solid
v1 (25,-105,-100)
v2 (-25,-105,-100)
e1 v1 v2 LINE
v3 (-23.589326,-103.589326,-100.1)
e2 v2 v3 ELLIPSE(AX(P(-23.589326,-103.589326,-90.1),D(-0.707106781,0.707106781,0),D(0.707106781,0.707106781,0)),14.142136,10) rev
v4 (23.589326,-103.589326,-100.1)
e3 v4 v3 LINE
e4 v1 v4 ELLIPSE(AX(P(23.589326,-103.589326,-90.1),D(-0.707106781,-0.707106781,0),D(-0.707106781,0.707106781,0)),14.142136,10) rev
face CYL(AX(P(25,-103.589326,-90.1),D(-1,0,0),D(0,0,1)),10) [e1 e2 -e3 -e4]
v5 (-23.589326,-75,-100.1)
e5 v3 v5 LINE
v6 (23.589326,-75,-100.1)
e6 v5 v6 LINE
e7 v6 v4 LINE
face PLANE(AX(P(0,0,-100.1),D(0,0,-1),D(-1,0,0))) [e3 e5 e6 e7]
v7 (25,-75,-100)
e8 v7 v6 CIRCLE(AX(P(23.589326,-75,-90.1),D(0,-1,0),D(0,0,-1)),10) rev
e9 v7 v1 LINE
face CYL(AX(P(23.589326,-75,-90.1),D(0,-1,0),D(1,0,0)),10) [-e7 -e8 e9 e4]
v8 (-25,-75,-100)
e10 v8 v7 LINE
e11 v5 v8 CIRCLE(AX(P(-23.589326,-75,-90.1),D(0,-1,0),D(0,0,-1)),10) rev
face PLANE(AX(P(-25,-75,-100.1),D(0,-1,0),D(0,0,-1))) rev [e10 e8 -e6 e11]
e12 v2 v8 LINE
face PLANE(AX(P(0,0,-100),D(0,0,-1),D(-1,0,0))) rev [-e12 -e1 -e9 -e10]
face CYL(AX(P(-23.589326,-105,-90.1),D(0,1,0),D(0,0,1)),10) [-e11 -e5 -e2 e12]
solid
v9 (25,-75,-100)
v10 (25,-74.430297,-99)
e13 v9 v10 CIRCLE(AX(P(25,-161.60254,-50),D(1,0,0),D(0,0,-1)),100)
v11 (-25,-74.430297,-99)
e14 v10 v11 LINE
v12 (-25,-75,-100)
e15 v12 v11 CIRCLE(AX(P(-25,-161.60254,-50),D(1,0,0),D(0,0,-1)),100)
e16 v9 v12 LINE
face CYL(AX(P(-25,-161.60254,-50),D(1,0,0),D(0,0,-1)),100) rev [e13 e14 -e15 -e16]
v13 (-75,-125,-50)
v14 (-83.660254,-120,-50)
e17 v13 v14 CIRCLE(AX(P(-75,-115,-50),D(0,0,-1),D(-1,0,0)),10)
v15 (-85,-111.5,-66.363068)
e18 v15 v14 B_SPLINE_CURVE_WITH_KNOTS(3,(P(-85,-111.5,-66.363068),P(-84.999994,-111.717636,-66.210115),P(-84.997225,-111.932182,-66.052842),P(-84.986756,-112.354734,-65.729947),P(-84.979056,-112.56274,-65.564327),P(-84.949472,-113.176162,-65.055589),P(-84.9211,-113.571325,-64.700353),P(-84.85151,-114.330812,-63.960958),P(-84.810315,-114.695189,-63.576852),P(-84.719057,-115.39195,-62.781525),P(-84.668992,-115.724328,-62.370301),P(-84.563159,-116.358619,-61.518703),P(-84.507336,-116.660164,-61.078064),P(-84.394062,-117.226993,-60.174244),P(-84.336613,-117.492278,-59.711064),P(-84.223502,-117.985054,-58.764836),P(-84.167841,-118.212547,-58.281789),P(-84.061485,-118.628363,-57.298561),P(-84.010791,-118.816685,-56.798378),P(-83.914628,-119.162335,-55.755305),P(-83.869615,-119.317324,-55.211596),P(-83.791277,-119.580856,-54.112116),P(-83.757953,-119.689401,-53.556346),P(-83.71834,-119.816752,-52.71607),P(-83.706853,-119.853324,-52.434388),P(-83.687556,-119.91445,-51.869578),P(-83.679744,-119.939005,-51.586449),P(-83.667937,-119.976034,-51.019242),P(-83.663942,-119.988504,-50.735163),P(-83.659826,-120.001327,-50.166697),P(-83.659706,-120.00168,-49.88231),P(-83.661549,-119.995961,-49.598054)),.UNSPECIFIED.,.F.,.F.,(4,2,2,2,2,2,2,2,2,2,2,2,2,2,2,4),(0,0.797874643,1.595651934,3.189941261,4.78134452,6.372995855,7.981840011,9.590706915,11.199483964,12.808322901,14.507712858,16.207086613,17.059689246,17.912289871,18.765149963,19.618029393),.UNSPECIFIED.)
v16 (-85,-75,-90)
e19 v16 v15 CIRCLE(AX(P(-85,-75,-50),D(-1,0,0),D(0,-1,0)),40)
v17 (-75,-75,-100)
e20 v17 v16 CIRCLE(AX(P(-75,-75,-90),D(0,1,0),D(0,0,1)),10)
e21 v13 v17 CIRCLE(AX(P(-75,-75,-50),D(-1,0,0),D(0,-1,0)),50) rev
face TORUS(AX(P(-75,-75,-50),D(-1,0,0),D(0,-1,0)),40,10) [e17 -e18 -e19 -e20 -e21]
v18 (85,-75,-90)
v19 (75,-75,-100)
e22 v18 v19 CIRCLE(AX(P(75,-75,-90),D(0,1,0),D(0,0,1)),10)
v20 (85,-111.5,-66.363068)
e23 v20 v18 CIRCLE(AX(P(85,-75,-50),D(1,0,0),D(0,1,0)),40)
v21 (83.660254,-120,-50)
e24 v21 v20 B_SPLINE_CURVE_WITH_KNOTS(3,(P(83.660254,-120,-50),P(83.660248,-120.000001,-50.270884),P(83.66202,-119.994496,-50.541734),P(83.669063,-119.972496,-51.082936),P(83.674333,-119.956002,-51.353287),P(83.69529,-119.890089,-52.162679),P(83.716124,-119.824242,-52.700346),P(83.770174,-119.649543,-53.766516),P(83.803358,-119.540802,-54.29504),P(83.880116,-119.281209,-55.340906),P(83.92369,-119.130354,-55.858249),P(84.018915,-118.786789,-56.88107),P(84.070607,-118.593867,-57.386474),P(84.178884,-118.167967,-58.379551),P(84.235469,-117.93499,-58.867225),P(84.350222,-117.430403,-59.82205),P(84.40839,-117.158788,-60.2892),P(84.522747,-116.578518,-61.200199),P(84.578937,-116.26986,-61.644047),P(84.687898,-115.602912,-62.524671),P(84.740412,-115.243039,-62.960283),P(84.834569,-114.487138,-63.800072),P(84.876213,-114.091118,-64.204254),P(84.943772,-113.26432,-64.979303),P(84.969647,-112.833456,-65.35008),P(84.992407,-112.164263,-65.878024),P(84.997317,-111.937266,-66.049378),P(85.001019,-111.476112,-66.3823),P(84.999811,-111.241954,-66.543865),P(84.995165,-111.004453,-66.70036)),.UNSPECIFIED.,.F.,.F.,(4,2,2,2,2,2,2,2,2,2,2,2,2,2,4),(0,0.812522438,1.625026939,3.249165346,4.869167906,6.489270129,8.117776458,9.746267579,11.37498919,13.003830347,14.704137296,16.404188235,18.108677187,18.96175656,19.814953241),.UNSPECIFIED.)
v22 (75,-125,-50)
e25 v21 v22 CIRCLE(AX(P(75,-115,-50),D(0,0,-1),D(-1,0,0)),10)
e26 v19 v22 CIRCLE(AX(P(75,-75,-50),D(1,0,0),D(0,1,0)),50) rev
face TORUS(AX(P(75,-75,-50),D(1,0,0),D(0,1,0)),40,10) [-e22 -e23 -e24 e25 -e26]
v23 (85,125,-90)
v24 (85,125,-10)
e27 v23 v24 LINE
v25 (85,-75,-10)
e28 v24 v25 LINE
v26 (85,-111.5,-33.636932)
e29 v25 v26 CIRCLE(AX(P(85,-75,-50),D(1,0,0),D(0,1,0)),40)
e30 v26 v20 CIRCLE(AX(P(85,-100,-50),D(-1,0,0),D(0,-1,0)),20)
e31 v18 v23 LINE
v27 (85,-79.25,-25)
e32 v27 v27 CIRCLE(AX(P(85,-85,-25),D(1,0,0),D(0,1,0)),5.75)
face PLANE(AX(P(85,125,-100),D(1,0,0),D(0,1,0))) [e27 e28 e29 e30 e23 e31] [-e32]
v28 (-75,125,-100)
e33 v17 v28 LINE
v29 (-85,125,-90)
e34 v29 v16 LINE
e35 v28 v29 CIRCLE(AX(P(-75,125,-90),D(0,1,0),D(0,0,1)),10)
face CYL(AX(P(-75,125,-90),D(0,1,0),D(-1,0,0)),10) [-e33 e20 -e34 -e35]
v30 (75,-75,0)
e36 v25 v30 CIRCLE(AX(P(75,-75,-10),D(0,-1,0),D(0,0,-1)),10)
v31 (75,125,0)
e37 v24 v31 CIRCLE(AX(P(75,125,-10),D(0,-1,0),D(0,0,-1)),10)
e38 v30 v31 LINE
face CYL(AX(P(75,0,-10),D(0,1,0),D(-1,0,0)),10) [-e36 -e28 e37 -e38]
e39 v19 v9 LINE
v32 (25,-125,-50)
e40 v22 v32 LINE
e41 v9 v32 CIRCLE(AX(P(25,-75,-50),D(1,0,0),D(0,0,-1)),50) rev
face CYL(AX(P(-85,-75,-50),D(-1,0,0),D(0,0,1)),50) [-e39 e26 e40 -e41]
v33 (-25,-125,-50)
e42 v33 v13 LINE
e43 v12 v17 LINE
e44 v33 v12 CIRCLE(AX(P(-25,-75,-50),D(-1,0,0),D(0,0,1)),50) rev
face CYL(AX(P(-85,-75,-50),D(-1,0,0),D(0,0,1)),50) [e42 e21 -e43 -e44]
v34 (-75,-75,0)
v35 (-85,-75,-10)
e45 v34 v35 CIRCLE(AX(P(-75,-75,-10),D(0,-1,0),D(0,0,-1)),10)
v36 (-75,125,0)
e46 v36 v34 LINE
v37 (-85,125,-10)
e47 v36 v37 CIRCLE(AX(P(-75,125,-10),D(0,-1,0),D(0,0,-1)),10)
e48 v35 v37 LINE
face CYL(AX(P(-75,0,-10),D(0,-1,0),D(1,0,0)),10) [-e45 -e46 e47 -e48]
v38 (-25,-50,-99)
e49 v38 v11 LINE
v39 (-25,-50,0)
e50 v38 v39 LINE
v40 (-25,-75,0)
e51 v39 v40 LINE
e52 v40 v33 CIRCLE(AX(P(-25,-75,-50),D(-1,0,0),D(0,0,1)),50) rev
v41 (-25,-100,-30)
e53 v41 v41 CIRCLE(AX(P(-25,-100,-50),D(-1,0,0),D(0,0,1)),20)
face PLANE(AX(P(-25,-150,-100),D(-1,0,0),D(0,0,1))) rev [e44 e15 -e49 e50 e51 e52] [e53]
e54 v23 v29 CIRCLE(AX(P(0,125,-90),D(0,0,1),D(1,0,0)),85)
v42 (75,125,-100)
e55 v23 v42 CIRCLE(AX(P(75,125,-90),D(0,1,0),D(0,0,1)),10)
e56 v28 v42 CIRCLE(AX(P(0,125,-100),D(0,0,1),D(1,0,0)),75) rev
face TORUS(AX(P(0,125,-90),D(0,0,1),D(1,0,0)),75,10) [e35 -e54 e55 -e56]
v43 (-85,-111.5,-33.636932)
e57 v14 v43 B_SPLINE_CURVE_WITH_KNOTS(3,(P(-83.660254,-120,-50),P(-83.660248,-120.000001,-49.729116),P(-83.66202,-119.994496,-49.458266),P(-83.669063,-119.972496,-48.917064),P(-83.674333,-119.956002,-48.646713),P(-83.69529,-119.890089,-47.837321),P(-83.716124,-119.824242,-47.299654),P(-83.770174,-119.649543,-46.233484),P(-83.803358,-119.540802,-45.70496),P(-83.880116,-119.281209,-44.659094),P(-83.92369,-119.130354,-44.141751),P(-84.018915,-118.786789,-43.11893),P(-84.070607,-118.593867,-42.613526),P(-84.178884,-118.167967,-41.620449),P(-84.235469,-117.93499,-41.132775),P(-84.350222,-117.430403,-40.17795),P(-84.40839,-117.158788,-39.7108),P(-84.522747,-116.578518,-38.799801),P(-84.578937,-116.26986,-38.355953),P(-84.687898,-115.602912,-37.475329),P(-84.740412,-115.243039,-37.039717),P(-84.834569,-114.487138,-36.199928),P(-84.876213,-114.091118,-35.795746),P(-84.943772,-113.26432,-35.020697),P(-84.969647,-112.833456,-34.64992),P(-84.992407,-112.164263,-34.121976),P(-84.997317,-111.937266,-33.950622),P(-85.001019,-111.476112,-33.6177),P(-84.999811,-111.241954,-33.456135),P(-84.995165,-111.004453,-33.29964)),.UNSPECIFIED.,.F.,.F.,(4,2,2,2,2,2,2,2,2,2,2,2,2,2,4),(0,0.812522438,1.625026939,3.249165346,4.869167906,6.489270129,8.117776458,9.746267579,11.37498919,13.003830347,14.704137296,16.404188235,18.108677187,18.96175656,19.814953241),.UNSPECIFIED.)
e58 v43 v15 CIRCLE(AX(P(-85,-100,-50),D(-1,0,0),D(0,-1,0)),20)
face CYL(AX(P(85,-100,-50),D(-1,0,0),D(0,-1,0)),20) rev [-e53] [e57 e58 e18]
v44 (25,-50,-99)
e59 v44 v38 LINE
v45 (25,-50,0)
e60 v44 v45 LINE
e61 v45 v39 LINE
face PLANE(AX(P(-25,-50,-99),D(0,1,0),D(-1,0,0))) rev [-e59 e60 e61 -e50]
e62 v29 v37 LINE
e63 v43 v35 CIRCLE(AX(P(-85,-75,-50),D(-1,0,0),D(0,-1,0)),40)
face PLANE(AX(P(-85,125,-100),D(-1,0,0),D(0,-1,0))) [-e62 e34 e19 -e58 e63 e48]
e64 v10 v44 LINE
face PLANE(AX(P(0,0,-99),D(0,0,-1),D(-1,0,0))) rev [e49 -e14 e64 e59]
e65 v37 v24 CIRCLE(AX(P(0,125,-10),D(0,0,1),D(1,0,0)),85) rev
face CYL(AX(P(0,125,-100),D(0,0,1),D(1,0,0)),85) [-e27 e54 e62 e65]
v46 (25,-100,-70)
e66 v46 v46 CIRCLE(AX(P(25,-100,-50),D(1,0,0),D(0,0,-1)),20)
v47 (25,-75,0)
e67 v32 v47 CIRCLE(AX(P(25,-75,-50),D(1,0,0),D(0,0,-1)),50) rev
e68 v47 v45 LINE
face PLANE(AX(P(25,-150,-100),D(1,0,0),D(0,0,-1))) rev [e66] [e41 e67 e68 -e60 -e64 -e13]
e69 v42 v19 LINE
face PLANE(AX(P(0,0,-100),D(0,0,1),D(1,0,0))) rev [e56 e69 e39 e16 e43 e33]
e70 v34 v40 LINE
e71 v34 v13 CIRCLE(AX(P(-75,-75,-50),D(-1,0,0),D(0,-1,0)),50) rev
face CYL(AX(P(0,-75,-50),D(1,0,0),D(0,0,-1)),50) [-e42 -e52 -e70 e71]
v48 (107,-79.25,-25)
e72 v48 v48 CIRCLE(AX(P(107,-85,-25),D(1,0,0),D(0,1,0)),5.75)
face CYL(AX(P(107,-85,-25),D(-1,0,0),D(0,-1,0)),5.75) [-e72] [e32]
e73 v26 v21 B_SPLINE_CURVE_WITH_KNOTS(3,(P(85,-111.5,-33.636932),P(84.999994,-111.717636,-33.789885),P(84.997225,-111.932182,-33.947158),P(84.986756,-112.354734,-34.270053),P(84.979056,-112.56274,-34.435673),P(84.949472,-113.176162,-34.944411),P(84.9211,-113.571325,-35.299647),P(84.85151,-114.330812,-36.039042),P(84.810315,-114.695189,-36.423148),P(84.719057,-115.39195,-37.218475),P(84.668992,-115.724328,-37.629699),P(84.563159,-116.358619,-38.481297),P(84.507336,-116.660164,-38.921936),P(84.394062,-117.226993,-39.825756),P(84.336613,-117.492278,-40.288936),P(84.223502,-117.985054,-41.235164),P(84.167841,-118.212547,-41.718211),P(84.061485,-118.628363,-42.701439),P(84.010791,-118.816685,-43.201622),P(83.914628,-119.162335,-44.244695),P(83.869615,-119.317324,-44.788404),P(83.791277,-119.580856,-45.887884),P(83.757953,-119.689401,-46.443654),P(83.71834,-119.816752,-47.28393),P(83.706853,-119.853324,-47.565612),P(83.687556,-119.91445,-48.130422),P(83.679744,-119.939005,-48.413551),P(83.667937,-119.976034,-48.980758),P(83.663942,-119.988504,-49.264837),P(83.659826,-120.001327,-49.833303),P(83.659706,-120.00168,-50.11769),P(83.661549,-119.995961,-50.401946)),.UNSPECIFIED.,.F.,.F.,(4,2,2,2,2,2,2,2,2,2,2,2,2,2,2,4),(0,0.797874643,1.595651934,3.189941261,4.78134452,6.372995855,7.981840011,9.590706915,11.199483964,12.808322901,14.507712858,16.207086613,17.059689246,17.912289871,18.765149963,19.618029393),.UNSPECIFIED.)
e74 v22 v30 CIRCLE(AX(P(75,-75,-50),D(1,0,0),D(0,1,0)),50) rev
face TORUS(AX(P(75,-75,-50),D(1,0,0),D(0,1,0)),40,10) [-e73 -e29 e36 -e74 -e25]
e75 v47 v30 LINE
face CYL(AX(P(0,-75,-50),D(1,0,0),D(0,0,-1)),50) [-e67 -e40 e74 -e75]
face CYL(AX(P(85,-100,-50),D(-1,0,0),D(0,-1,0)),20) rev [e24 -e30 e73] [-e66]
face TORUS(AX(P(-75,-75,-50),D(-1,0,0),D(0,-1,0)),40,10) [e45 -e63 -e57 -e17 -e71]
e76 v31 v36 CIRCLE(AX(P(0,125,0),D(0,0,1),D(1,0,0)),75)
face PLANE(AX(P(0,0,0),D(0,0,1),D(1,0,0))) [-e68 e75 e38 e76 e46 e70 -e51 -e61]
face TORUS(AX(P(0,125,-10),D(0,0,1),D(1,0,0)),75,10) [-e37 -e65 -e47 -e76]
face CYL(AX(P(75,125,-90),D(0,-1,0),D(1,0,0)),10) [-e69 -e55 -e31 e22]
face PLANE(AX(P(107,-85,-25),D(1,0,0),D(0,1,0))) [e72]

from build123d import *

# Parameters (mm, degrees)
BOSS_EXTRUDE1_DEPTH    = 100
SKETCH2_W              = 50
SKETCH2_H              = 50
CUT_EXTRUDE1_DEPTH     = 182.245689604
CUT_EXTRUDE2_DEPTH     = 25
SKETCH7_R              = 20
CUT_EXTRUDE3_DEPTH     = 234.505888577
FILLET2_R              = 50
CUT_EXTRUDE6_START     = -125
CUT_EXTRUDE6_OUTLINE_W = 50
CUT_EXTRUDE6_OUTLINE_H = 6.698729811
CUT_EXTRUDE6_DEPTH     = 50
CUT_EXTRUDE7_DEPTH     = 25
BOSS_EXTRUDE2_DEPTH    = 100
FILLET4_R              = 10
SKETCH11_W             = 50
SKETCH11_H             = 25
CUT_EXTRUDE11_DEPTH    = 99
SKETCH16_W             = 50
SKETCH16_H             = 30
BOSS_EXTRUDE3_DEPTH    = 0.1
FILLET5_R              = 10
SKETCH17_R             = 5.75
BOSS_EXTRUDE4_DEPTH    = 22


with BuildPart() as part:
    # Sketch1 → Boss-Extrude1 (new body)
    with BuildSketch(Plane.XY):
        Polygon((-85, 125), (10.2, 125), (59.8, 125), (85, 125), (85, -125), (-85, -125), align=None)
    extrude(amount=-BOSS_EXTRUDE1_DEPTH)

    # Sketch2 → Cut-Extrude1 (cut, through all)
    with BuildSketch(Plane.XY):
        with Locations((0, -125)):
            Rectangle(SKETCH2_W, SKETCH2_H)
    extrude(amount=-CUT_EXTRUDE1_DEPTH, mode=Mode.SUBTRACT)

    # Sketch6 → Cut-Extrude2 (cut, symmetric)
    with BuildSketch(Plane(origin=(0, 0, 0), x_dir=(0, 0, -1), z_dir=(1, 0, 0))):
        with BuildLine():
            Line((100, -100), (0, -100))
            ThreePointArc((0, -100), (50, -50), (100, -100))
        make_face()
    extrude(amount=CUT_EXTRUDE2_DEPTH, both=True, mode=Mode.SUBTRACT)

    # Sketch7 → Cut-Extrude3 (cut, through all)
    with BuildSketch(Plane.ZY.offset(85)):
        with Locations(Location((-50, -100, 0), (0, 0, 270))):
            Circle(SKETCH7_R)
    extrude(amount=-CUT_EXTRUDE3_DEPTH, mode=Mode.SUBTRACT)

    # Fillet2
    fillet2_edges = [part.edges().sort_by_distance(p)[0] for p in [
        (-55, -125, -100),
        (-55, -125, 0),
    ]]
    fillet(fillet2_edges, radius=FILLET2_R - 0.0001)  # a hair under: the kernel refuses the full size

    # Cut-Extrude6: read off the stored shape, not the designer's step
    # Cut-Extrude6 outline → Cut-Extrude6 (cut)
    with BuildSketch(Plane(origin=(0, 0, 0), x_dir=(1, 0, 0), z_dir=(0, 1, 0)).offset(CUT_EXTRUDE6_START)):
        with Locations((0, 96.650635095)):
            Rectangle(CUT_EXTRUDE6_OUTLINE_W, CUT_EXTRUDE6_OUTLINE_H)
        with Locations((0, 3.349364906)):
            Rectangle(CUT_EXTRUDE6_OUTLINE_W, CUT_EXTRUDE6_OUTLINE_H)
    extrude(amount=CUT_EXTRUDE6_DEPTH, mode=Mode.SUBTRACT)

    # Sketch10 → Cut-Extrude7 (cut, symmetric)
    with BuildSketch(Plane(origin=(0, 0, 0), x_dir=(0, 0, -1), z_dir=(1, 0, 0))):
        with BuildLine():
            Line((0, -75), (100, -75))
            ThreePointArc((100, -75), (50, -61.602540378), (0, -75))
        make_face()
    extrude(amount=CUT_EXTRUDE7_DEPTH, both=True, mode=Mode.SUBTRACT)

    # Sketch15 → Boss-Extrude2 (add)
    with BuildSketch(Plane.XY):
        with BuildLine():
            Line((-85, 125), (85, 125))
            ThreePointArc((85, 125), (0, 210), (-85, 125))
        make_face()
    extrude(amount=-BOSS_EXTRUDE2_DEPTH)

    # Fillet4
    # the kernel refuses this fillet: 10 mm, written as the material it takes off along each edge
    with BuildSketch(Plane(origin=(0, 125, -100), x_dir=(1, 0, 0), z_dir=(0, -1, 0))) as fillet4_piece_1:
        with BuildLine():
            CenterArc((85 - FILLET4_R, FILLET4_R), FILLET4_R, 270, 90)
            Line((85, FILLET4_R), (85, 0))
            Line((85, 0), (85 - FILLET4_R, 0))
        make_face()
    revolve(axis=Axis((0, 125, -100), (0, 0, 1)), revolution_arc=180, mode=Mode.SUBTRACT)
    with BuildSketch(Plane(origin=(0, 125, 0), x_dir=(1, 0, 0), z_dir=(0, -1, 0))) as fillet4_piece_2:
        with BuildLine():
            CenterArc((85 - FILLET4_R, -FILLET4_R), FILLET4_R, 0, 90)
            Line((85, -FILLET4_R), (85, 0))
            Line((85, 0), (85 - FILLET4_R, 0))
        make_face()
    revolve(axis=Axis((0, 125, 0), (0, 0, 1)), revolution_arc=180, mode=Mode.SUBTRACT)
    with BuildSketch(Plane(origin=(-85, -75.0001, -100), x_dir=(0, 0, 1), z_dir=(0, 1, 0)), Plane(origin=(85, 125, 0), x_dir=(-1, 0, 0), z_dir=(0, -1, 0))) as fillet4_piece_3:
        with BuildLine():
            CenterArc((FILLET4_R, FILLET4_R), FILLET4_R, 180, 90)
            Line((0, FILLET4_R), (0, 0))
            Line((0, 0), (FILLET4_R, 0))
        make_face()
    extrude(amount=200.0001, mode=Mode.SUBTRACT)
    with BuildSketch(Plane(origin=(85, 125, -100), x_dir=(-1, 0, 0), z_dir=(0, -1, 0)), Plane(origin=(-85, -75.0001, 0), x_dir=(0, 0, -1), z_dir=(0, 1, 0))) as fillet4_piece_4:
        with BuildLine():
            CenterArc((FILLET4_R, -FILLET4_R), FILLET4_R, 90, 90)
            Line((0, -FILLET4_R), (0, 0))
            Line((0, 0), (FILLET4_R, 0))
        make_face()
    extrude(amount=200.0001, mode=Mode.SUBTRACT)
    with BuildSketch(Plane(origin=(85, -75.0001, -49.9999), x_dir=(0, 0, 1), z_dir=(0, 1, 0))) as fillet4_piece_5:
        with BuildLine():
            CenterArc((49.9999 - FILLET4_R, -FILLET4_R), FILLET4_R, 0, 90)
            Line((49.9999 - FILLET4_R, 0), (49.9999, 0))
            Line((49.9999, 0), (49.9999, -FILLET4_R))
        make_face()
    revolve(axis=Axis((85, -75.0001, -49.9999), (1, 0, 0)), revolution_arc=90, mode=Mode.SUBTRACT)
    with BuildSketch(Plane(origin=(85, -75.0001, -50.0001), x_dir=(0, 0, -1), z_dir=(0, 1, 0))) as fillet4_piece_6:
        with BuildLine():
            CenterArc((49.9999 - FILLET4_R, FILLET4_R), FILLET4_R, 270, 90)
            Line((49.9999, FILLET4_R), (49.9999, 0))
            Line((49.9999, 0), (49.9999 - FILLET4_R, 0))
        make_face()
    revolve(axis=Axis((85, -75.0001, -50.0001), (-1, 0, 0)), revolution_arc=90, mode=Mode.SUBTRACT)
    with BuildSketch(Plane(origin=(-85, -75.0001, -49.9999), x_dir=(0, 0, 1), z_dir=(0, 1, 0))) as fillet4_piece_7:
        with BuildLine():
            CenterArc((49.9999 - FILLET4_R, FILLET4_R), FILLET4_R, 270, 90)
            Line((49.9999, FILLET4_R), (49.9999, 0))
            Line((49.9999, 0), (49.9999 - FILLET4_R, 0))
        make_face()
    revolve(axis=Axis((-85, -75.0001, -49.9999), (1, 0, 0)), revolution_arc=90, mode=Mode.SUBTRACT)
    with BuildSketch(Plane(origin=(-85, -75.0001, -50.0001), x_dir=(0, 0, -1), z_dir=(0, 1, 0))) as fillet4_piece_8:
        with BuildLine():
            CenterArc((49.9999 - FILLET4_R, -FILLET4_R), FILLET4_R, 0, 90)
            Line((49.9999, -FILLET4_R), (49.9999, 0))
            Line((49.9999, 0), (49.9999 - FILLET4_R, 0))
        make_face()
    revolve(axis=Axis((-85, -75.0001, -50.0001), (-1, 0, 0)), revolution_arc=90, mode=Mode.SUBTRACT)
    with BuildSketch(Plane(origin=(-85, -125, -49.9999), x_dir=(0, 1, 0), z_dir=(0, 0, -1))) as fillet4_piece_9:
        with BuildLine():
            CenterArc((FILLET4_R, FILLET4_R), FILLET4_R, 180, 90)
            Line((0, FILLET4_R), (0, 0))
            Line((0, 0), (FILLET4_R, 0))
        make_face()
    extrude(amount=0.0002, mode=Mode.SUBTRACT)
    with BuildSketch(Plane(origin=(85, -125, -49.9999), x_dir=(0, 1, 0), z_dir=(0, 0, -1))) as fillet4_piece_10:
        with BuildLine():
            CenterArc((FILLET4_R, -FILLET4_R), FILLET4_R, 90, 90)
            Line((0, -FILLET4_R), (0, 0))
            Line((0, 0), (FILLET4_R, 0))
        make_face()
    extrude(amount=0.0002, mode=Mode.SUBTRACT)

    # Sketch11 → Cut-Extrude11 (cut)
    with BuildSketch(Plane.XY):
        with Locations((0, -62.5)):
            Rectangle(SKETCH11_W, SKETCH11_H)
    extrude(amount=-CUT_EXTRUDE11_DEPTH, mode=Mode.SUBTRACT)

    # Sketch17 → Boss-Extrude4 (add)
    with BuildSketch(Plane(origin=(85, 0, 0), x_dir=(0, 0, -1), z_dir=(1, 0, 0))):
        with Locations(Location((25, -85, 0), (0, 0, 90))):
            Circle(SKETCH17_R)
    extrude(amount=BOSS_EXTRUDE4_DEPTH)


with BuildPart() as body_2:
    # Sketch16 → Boss-Extrude3 (new body)
    with BuildSketch(Plane(origin=(0, 0, -100), x_dir=(-1, 0, 0), z_dir=(0, 0, -1))):
        with Locations((0, -90)):
            Rectangle(SKETCH16_W, SKETCH16_H)
    extrude(amount=BOSS_EXTRUDE3_DEPTH)

    # Fillet5
    # the kernel refuses this fillet: 10 mm, written as the material it takes off along each edge
    with BuildSketch(Plane(origin=(25, -71.473316005, -100.1), x_dir=(0, 0, 1), z_dir=(0, -1, 0)), Plane(origin=(-25, -108.526683995, -100.1), x_dir=(0, 0, 1), z_dir=(0, 1, 0))) as fillet5_piece_1:
        with BuildLine():
            CenterArc((10, 1.410673598), FILLET5_R, 180, 8.109614456)
            Line((0, 1.410673598), (0, 0))
            Line((0, 0), (0.1, 0))
        make_face()
    extrude(amount=37.05336799, mode=Mode.SUBTRACT)
    with BuildSketch(Plane(origin=(28.526683995, -105, -100.1), x_dir=(0, 0, 1), z_dir=(-1, 0, 0))) as fillet5_piece_2:
        with BuildLine():
            CenterArc((10, 1.410673598), FILLET5_R, 180, 8.109614456)
            Line((0, 1.410673598), (0, 0))
            Line((0, 0), (0.1, 0))
        make_face()
    extrude(amount=57.05336799, mode=Mode.SUBTRACT)


solid = Compound([part.part, body_2.part])
